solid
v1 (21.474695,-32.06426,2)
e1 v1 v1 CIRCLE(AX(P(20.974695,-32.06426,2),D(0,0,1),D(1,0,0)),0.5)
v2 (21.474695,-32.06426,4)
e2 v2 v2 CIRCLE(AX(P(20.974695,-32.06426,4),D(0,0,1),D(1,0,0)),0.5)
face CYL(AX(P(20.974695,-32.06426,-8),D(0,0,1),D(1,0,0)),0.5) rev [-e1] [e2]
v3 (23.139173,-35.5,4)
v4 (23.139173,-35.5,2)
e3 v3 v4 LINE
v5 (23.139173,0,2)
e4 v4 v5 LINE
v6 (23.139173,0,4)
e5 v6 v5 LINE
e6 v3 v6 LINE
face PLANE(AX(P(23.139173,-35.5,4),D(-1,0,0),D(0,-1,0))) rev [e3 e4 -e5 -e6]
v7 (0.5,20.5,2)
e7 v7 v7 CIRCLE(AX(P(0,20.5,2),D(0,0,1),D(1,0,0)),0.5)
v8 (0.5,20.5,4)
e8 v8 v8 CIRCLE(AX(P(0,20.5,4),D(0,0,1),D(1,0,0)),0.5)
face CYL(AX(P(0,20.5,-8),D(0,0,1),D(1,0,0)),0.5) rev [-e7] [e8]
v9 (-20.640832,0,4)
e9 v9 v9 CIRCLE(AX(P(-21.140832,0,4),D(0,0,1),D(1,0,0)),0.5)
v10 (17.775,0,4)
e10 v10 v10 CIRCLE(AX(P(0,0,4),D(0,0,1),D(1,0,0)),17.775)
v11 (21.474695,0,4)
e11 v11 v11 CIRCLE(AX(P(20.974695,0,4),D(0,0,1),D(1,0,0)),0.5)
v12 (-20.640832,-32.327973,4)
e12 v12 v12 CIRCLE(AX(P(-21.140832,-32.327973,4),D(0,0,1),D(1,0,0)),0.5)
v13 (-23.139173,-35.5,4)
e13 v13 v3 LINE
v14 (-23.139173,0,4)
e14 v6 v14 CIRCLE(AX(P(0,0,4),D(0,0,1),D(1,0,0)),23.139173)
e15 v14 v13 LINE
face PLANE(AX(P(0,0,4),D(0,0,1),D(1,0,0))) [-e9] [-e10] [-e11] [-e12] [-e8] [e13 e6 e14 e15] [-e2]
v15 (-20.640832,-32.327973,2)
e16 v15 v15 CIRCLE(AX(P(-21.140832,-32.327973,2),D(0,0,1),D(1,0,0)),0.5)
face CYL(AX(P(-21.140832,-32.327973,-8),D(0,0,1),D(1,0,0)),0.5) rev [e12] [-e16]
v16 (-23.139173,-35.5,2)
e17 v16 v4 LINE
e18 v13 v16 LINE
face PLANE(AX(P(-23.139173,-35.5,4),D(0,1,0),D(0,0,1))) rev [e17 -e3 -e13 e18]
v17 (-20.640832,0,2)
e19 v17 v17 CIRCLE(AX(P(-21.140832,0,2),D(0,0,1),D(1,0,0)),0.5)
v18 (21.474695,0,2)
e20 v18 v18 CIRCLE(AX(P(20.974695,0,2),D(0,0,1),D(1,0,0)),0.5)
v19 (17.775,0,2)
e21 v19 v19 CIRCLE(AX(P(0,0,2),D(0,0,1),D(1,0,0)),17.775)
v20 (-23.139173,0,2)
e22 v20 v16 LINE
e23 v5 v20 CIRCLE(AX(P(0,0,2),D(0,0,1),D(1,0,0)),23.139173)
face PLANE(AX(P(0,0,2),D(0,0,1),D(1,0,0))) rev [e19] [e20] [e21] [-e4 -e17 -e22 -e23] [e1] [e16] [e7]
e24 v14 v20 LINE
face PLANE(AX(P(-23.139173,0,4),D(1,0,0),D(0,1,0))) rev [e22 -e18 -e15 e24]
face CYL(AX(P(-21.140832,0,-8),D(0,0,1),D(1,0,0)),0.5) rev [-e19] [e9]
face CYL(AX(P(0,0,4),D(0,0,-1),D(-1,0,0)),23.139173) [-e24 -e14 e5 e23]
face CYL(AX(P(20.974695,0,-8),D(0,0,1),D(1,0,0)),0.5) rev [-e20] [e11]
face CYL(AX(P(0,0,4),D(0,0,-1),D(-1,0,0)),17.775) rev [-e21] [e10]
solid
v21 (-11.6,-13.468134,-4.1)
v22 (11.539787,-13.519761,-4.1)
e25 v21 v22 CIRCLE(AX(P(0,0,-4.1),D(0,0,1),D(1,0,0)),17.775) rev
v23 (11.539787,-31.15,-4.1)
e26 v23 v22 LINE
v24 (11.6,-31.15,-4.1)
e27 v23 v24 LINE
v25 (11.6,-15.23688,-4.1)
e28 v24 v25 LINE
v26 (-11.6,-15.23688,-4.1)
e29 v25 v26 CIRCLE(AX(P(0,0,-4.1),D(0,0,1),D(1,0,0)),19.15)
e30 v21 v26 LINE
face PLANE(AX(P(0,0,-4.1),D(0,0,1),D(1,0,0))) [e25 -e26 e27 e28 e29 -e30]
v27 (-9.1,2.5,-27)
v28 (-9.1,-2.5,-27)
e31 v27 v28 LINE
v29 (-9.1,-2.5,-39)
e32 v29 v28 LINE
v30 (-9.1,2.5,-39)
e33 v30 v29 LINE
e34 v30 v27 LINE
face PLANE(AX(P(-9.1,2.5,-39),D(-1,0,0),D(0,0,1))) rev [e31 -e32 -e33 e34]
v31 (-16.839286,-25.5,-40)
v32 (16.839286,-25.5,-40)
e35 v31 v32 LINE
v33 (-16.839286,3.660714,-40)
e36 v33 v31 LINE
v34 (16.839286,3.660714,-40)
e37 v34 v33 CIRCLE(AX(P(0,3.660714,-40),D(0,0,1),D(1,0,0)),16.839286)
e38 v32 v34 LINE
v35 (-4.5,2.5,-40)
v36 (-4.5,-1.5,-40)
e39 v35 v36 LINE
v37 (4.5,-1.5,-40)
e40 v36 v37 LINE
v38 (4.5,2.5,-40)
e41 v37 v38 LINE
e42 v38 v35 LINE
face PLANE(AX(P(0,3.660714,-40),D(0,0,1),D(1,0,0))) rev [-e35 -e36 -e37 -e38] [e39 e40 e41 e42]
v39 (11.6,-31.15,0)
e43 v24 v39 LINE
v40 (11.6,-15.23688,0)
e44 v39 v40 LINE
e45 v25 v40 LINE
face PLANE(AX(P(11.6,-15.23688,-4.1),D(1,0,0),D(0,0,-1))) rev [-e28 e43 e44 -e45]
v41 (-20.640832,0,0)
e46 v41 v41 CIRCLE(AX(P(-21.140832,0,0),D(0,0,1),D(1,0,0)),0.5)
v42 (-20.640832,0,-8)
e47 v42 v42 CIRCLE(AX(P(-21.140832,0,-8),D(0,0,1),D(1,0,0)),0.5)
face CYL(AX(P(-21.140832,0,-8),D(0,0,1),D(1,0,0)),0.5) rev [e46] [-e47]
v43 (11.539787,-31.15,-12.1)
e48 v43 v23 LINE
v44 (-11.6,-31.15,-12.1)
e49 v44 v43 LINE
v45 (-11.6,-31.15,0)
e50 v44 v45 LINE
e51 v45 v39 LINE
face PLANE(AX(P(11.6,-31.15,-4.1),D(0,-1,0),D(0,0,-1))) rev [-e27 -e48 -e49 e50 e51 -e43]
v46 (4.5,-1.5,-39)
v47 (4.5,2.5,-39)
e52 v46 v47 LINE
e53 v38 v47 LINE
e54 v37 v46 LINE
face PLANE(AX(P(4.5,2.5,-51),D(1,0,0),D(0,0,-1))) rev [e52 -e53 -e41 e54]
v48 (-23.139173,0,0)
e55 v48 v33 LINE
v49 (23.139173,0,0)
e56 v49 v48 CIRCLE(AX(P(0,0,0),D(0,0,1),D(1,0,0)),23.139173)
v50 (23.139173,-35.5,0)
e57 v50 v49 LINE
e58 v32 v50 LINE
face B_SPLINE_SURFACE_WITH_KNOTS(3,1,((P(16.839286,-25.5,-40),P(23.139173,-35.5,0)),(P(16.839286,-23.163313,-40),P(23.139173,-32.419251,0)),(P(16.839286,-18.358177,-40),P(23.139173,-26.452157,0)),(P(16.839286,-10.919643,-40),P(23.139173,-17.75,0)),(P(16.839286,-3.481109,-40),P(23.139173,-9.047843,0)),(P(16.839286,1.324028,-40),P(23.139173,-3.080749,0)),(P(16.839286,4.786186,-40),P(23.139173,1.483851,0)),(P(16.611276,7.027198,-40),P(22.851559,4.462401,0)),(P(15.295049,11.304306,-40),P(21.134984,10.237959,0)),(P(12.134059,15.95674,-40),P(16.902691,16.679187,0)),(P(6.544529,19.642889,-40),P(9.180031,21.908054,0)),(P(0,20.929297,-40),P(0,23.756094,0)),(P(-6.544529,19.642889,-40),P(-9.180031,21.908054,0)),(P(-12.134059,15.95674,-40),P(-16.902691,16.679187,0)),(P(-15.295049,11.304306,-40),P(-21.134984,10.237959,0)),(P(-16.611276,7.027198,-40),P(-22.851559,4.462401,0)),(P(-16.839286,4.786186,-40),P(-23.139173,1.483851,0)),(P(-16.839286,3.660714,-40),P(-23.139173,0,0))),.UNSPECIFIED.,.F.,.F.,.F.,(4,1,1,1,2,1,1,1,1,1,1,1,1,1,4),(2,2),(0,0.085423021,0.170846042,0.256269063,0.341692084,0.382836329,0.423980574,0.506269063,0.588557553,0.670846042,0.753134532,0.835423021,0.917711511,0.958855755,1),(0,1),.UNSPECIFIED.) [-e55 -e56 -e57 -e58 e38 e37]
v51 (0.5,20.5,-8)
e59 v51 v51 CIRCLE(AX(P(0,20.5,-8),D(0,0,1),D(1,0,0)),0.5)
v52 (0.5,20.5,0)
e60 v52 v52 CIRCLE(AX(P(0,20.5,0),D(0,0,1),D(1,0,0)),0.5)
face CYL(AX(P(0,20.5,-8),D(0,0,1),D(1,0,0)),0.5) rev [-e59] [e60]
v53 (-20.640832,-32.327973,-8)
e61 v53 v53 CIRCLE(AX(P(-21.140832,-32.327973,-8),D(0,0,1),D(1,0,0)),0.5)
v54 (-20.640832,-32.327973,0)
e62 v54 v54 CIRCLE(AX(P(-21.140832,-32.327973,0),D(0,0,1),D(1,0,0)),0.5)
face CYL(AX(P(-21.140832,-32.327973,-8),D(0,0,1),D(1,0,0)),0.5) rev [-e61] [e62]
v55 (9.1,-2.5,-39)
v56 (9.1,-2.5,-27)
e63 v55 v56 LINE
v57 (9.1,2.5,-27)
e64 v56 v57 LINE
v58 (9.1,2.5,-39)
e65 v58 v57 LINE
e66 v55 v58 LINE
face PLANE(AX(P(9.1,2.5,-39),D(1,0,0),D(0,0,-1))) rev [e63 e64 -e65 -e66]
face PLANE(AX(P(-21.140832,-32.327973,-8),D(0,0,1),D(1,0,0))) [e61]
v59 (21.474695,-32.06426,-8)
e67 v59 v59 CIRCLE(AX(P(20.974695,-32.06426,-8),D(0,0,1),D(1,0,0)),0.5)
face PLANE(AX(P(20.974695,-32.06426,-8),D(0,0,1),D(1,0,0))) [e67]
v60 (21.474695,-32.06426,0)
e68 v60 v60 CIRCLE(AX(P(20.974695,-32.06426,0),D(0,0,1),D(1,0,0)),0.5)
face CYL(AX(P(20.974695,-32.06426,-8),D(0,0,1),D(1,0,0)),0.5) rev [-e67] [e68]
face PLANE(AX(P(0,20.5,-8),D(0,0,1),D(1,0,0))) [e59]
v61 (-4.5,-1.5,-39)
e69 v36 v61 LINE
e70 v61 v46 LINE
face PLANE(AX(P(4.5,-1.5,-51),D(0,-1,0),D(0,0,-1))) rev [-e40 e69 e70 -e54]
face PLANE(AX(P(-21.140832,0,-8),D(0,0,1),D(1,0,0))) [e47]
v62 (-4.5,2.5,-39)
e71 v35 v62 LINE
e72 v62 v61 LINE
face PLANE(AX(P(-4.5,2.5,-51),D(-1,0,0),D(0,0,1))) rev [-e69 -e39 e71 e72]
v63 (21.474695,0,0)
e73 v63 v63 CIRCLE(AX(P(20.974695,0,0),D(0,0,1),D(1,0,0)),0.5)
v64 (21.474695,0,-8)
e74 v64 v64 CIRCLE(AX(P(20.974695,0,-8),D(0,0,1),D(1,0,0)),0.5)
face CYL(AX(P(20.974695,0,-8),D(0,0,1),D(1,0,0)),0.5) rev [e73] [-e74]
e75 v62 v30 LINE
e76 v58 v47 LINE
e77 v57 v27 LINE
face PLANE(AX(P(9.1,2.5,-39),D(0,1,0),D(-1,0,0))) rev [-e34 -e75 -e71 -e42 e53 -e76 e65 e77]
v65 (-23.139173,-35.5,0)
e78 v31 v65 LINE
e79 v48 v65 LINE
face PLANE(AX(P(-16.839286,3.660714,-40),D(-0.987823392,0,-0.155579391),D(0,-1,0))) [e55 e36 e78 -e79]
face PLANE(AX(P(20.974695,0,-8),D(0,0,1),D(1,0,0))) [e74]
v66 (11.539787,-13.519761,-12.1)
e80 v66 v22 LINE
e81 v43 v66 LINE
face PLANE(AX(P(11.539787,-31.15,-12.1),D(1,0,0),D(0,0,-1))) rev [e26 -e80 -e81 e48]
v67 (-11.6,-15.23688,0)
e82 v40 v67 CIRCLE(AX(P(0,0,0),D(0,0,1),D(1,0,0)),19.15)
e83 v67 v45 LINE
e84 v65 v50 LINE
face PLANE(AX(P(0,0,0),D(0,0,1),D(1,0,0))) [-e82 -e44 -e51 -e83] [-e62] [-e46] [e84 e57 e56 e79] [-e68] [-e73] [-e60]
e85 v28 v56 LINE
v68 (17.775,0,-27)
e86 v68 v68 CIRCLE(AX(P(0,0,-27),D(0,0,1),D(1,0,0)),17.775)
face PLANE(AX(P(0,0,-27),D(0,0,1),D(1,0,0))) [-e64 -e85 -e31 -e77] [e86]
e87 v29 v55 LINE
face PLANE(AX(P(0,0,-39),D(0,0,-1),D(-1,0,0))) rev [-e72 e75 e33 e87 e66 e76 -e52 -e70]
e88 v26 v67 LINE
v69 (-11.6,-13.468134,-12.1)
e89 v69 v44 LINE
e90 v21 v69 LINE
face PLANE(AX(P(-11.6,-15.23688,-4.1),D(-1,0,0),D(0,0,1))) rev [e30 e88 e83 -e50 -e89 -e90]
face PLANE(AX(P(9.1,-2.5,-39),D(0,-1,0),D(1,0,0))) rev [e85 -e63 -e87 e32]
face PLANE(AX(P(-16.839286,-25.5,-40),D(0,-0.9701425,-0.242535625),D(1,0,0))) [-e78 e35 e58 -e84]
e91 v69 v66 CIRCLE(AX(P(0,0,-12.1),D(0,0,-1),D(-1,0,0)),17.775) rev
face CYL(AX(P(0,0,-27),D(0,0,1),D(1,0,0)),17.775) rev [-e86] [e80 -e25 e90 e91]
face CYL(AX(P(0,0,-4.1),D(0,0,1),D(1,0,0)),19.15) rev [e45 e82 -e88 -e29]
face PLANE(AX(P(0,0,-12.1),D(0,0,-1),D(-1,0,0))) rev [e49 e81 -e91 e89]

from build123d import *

# Parameters (mm, degrees)
ESBO_O3_R                = 17.775
CORTE_EXTRUS_O2_DEPTH    = 27
ESBO_O5_W                = 18.2
ESBO_O5_H                = 5
CORTE_EXTRUS_O3_DEPTH    = 12
ESBO_O6_W                = 9
ESBO_O6_H                = 4
CORTE_EXTRUS_O4_DEPTH    = 12
CORTE_EXTRUS_O5_DEPTH    = 4.1
ESBO_O9_W                = 23.13978744
ESBO_O9_H                = 20.617894971
CORTE_EXTRUS_O6_DEPTH    = 8
ESBO_O10_R               = 17.775
RESSALTO_EXTRUS_O1_DEPTH = 2
ESBO_O11_R               = 0.5
CORTE_EXTRUS_O7_DEPTH    = 12


with BuildPart() as part:
    # Loft1: read off the stored shape, not the designer's step
    # Loft1: loft between two sections, ruled curve by curve
    loft1_from = [
        Edge.make_bspline([(16.839285714, -25.5, -40), (16.839285714, -23.163313322, -40), (16.839285714, -18.358176955, -40), (16.839285714, -10.919642857, -40), (16.839285714, -3.481108759, -40), (16.839285714, 1.324027608, -40), (16.839285714, 4.786186161, -40), (16.611276147, 7.027198338, -40), (15.295049421, 11.304306095, -40), (12.13405931, 15.956740347, -40), (6.544528745, 19.642888976, -40), (0, 20.929296705, -40), (-6.544528745, 19.642888976, -40), (-12.13405931, 15.956740347, -40), (-15.295049421, 11.304306095, -40), (-16.611276147, 7.027198338, -40), (-16.839285714, 4.786186161, -40), (-16.839285714, 3.660714286, -40)], [0, 0, 0, 0, 0.085423021, 0.170846042, 0.256269063, 0.341692084, 0.341692084, 0.382836329, 0.423980574, 0.506269063, 0.588557553, 0.670846042, 0.753134532, 0.835423021, 0.917711511, 0.958855755, 1, 1, 1, 1], 3),
        Edge.make_line((-16.839285714, 3.660714286, -40), (-16.839285714, -25.5, -40)),
        Edge.make_line((-16.839285714, -25.5, -40), (16.839285714, -25.5, -40)),
    ]
    loft1_to = [
        Edge.make_bspline([(23.139172611, -35.5, 0), (23.139172611, -32.419251356, 0), (23.139172611, -26.452157178, 0), (23.139172611, -17.75, 0), (23.139172611, -9.047842822, 0), (23.139172611, -3.080748644, 0), (23.139172611, 1.483851466, 0), (22.851558574, 4.462401025, 0), (21.134983596, 10.237959163, 0), (16.9026912, 16.679187276, 0), (9.180031183, 21.908054295, 0), (0, 23.75609401, 0), (-9.180031183, 21.908054295, 0), (-16.9026912, 16.679187276, 0), (-21.134983596, 10.237959163, 0), (-22.851558574, 4.462401025, 0), (-23.139172611, 1.483851466, 0), (-23.139172611, 0, 0)], [0, 0, 0, 0, 0.085423021, 0.170846042, 0.256269063, 0.341692084, 0.341692084, 0.382836329, 0.423980574, 0.506269063, 0.588557553, 0.670846042, 0.753134532, 0.835423021, 0.917711511, 0.958855755, 1, 1, 1, 1], 3),
        Edge.make_line((-23.139172611, 0, 0), (-23.139172611, -35.5, 0)),
        Edge.make_line((-23.139172611, -35.5, 0), (23.139172611, -35.5, 0)),
    ]
    loft1 = Solid(Shell([*[Face.make_surface_from_curves(loft1_from[k], loft1_to[k]) for k in range(3)], Face(Wire(loft1_from)), Face(Wire(loft1_to))]))
    add(loft1)

    # Esboço3 → Corte-extrusão2 (cut)
    with BuildSketch(Plane.XY):
        Circle(ESBO_O3_R)
    extrude(amount=-CORTE_EXTRUS_O2_DEPTH, mode=Mode.SUBTRACT)

    # Esboço5 → Corte-extrusão3 (cut)
    with BuildSketch(Plane.XY.offset(-27)):
        Rectangle(ESBO_O5_W, ESBO_O5_H)
    extrude(amount=-CORTE_EXTRUS_O3_DEPTH, mode=Mode.SUBTRACT)

    # Esboço6 → Corte-extrusão4 (cut)
    with BuildSketch(Plane.XY.offset(-39)):
        with Locations((0, 0.5)):
            Rectangle(ESBO_O6_W, ESBO_O6_H)
    extrude(amount=-CORTE_EXTRUS_O4_DEPTH, mode=Mode.SUBTRACT)

    # Esboço8 → Corte-extrusão5 (cut)
    with BuildSketch(Plane.XY):
        with BuildLine():
            Line((11.6, -15.236879602), (11.6, -31.15))
            Line((11.6, -31.15), (-11.6, -31.15))
            Line((-11.6, -31.15), (-11.6, -15.236879602))
            ThreePointArc((-11.6, -15.236879602), (0, 19.15), (11.6, -15.236879602))
        make_face()
    extrude(amount=-CORTE_EXTRUS_O5_DEPTH, mode=Mode.SUBTRACT)

    # Esboço9 → Corte-extrusão6 (cut)
    with BuildSketch(Plane.XY.offset(-4.1)):
        with Locations((-0.03010628, -20.841052514)):
            Rectangle(ESBO_O9_W, ESBO_O9_H)
    extrude(amount=-CORTE_EXTRUS_O6_DEPTH, mode=Mode.SUBTRACT)


with BuildPart() as body_2:
    # Esboço10 → Ressalto-extrusão1 (new body)
    with BuildSketch(Plane.XY.offset(2)):
        with BuildLine():
            Line((23.139172611, -35.5), (23.139172611, 0))
            ThreePointArc((23.139172611, 0), (0, 23.139172611), (-23.139172611, 0))
            Line((-23.139172611, 0), (-23.139172611, -35.5))
            Line((-23.139172611, -35.5), (23.139172611, -35.5))
        make_face()
        Circle(ESBO_O10_R, mode=Mode.SUBTRACT)
    extrude(amount=RESSALTO_EXTRUS_O1_DEPTH)


with BuildPart() as corte_extrus_o7_tool:
    # Esboço11 → Corte-extrusão7 (new body)
    with BuildSketch(Plane.XY.offset(4)):
        with Locations((0, 20.5)):
            Circle(ESBO_O11_R)
        with Locations((-21.140831683, 0)):
            Circle(ESBO_O11_R)
        with Locations((20.974695481, 0)):
            Circle(ESBO_O11_R)
        with Locations((-21.140831683, -32.327973325)):
            Circle(ESBO_O11_R)
        with Locations((20.974695481, -32.064260334)):
            Circle(ESBO_O11_R)
    extrude(amount=-CORTE_EXTRUS_O7_DEPTH)


with BuildPart() as part_1:
    add(part.part)

    # Corte-extrusão7: cut by corte_extrus_o7_tool
    add(corte_extrus_o7_tool.part, mode=Mode.SUBTRACT)


with BuildPart() as body_2_1:
    add(body_2.part)

    # Corte-extrusão7: cut by corte_extrus_o7_tool
    add(corte_extrus_o7_tool.part, mode=Mode.SUBTRACT)


solid = Compound([part_1.part, body_2_1.part])
